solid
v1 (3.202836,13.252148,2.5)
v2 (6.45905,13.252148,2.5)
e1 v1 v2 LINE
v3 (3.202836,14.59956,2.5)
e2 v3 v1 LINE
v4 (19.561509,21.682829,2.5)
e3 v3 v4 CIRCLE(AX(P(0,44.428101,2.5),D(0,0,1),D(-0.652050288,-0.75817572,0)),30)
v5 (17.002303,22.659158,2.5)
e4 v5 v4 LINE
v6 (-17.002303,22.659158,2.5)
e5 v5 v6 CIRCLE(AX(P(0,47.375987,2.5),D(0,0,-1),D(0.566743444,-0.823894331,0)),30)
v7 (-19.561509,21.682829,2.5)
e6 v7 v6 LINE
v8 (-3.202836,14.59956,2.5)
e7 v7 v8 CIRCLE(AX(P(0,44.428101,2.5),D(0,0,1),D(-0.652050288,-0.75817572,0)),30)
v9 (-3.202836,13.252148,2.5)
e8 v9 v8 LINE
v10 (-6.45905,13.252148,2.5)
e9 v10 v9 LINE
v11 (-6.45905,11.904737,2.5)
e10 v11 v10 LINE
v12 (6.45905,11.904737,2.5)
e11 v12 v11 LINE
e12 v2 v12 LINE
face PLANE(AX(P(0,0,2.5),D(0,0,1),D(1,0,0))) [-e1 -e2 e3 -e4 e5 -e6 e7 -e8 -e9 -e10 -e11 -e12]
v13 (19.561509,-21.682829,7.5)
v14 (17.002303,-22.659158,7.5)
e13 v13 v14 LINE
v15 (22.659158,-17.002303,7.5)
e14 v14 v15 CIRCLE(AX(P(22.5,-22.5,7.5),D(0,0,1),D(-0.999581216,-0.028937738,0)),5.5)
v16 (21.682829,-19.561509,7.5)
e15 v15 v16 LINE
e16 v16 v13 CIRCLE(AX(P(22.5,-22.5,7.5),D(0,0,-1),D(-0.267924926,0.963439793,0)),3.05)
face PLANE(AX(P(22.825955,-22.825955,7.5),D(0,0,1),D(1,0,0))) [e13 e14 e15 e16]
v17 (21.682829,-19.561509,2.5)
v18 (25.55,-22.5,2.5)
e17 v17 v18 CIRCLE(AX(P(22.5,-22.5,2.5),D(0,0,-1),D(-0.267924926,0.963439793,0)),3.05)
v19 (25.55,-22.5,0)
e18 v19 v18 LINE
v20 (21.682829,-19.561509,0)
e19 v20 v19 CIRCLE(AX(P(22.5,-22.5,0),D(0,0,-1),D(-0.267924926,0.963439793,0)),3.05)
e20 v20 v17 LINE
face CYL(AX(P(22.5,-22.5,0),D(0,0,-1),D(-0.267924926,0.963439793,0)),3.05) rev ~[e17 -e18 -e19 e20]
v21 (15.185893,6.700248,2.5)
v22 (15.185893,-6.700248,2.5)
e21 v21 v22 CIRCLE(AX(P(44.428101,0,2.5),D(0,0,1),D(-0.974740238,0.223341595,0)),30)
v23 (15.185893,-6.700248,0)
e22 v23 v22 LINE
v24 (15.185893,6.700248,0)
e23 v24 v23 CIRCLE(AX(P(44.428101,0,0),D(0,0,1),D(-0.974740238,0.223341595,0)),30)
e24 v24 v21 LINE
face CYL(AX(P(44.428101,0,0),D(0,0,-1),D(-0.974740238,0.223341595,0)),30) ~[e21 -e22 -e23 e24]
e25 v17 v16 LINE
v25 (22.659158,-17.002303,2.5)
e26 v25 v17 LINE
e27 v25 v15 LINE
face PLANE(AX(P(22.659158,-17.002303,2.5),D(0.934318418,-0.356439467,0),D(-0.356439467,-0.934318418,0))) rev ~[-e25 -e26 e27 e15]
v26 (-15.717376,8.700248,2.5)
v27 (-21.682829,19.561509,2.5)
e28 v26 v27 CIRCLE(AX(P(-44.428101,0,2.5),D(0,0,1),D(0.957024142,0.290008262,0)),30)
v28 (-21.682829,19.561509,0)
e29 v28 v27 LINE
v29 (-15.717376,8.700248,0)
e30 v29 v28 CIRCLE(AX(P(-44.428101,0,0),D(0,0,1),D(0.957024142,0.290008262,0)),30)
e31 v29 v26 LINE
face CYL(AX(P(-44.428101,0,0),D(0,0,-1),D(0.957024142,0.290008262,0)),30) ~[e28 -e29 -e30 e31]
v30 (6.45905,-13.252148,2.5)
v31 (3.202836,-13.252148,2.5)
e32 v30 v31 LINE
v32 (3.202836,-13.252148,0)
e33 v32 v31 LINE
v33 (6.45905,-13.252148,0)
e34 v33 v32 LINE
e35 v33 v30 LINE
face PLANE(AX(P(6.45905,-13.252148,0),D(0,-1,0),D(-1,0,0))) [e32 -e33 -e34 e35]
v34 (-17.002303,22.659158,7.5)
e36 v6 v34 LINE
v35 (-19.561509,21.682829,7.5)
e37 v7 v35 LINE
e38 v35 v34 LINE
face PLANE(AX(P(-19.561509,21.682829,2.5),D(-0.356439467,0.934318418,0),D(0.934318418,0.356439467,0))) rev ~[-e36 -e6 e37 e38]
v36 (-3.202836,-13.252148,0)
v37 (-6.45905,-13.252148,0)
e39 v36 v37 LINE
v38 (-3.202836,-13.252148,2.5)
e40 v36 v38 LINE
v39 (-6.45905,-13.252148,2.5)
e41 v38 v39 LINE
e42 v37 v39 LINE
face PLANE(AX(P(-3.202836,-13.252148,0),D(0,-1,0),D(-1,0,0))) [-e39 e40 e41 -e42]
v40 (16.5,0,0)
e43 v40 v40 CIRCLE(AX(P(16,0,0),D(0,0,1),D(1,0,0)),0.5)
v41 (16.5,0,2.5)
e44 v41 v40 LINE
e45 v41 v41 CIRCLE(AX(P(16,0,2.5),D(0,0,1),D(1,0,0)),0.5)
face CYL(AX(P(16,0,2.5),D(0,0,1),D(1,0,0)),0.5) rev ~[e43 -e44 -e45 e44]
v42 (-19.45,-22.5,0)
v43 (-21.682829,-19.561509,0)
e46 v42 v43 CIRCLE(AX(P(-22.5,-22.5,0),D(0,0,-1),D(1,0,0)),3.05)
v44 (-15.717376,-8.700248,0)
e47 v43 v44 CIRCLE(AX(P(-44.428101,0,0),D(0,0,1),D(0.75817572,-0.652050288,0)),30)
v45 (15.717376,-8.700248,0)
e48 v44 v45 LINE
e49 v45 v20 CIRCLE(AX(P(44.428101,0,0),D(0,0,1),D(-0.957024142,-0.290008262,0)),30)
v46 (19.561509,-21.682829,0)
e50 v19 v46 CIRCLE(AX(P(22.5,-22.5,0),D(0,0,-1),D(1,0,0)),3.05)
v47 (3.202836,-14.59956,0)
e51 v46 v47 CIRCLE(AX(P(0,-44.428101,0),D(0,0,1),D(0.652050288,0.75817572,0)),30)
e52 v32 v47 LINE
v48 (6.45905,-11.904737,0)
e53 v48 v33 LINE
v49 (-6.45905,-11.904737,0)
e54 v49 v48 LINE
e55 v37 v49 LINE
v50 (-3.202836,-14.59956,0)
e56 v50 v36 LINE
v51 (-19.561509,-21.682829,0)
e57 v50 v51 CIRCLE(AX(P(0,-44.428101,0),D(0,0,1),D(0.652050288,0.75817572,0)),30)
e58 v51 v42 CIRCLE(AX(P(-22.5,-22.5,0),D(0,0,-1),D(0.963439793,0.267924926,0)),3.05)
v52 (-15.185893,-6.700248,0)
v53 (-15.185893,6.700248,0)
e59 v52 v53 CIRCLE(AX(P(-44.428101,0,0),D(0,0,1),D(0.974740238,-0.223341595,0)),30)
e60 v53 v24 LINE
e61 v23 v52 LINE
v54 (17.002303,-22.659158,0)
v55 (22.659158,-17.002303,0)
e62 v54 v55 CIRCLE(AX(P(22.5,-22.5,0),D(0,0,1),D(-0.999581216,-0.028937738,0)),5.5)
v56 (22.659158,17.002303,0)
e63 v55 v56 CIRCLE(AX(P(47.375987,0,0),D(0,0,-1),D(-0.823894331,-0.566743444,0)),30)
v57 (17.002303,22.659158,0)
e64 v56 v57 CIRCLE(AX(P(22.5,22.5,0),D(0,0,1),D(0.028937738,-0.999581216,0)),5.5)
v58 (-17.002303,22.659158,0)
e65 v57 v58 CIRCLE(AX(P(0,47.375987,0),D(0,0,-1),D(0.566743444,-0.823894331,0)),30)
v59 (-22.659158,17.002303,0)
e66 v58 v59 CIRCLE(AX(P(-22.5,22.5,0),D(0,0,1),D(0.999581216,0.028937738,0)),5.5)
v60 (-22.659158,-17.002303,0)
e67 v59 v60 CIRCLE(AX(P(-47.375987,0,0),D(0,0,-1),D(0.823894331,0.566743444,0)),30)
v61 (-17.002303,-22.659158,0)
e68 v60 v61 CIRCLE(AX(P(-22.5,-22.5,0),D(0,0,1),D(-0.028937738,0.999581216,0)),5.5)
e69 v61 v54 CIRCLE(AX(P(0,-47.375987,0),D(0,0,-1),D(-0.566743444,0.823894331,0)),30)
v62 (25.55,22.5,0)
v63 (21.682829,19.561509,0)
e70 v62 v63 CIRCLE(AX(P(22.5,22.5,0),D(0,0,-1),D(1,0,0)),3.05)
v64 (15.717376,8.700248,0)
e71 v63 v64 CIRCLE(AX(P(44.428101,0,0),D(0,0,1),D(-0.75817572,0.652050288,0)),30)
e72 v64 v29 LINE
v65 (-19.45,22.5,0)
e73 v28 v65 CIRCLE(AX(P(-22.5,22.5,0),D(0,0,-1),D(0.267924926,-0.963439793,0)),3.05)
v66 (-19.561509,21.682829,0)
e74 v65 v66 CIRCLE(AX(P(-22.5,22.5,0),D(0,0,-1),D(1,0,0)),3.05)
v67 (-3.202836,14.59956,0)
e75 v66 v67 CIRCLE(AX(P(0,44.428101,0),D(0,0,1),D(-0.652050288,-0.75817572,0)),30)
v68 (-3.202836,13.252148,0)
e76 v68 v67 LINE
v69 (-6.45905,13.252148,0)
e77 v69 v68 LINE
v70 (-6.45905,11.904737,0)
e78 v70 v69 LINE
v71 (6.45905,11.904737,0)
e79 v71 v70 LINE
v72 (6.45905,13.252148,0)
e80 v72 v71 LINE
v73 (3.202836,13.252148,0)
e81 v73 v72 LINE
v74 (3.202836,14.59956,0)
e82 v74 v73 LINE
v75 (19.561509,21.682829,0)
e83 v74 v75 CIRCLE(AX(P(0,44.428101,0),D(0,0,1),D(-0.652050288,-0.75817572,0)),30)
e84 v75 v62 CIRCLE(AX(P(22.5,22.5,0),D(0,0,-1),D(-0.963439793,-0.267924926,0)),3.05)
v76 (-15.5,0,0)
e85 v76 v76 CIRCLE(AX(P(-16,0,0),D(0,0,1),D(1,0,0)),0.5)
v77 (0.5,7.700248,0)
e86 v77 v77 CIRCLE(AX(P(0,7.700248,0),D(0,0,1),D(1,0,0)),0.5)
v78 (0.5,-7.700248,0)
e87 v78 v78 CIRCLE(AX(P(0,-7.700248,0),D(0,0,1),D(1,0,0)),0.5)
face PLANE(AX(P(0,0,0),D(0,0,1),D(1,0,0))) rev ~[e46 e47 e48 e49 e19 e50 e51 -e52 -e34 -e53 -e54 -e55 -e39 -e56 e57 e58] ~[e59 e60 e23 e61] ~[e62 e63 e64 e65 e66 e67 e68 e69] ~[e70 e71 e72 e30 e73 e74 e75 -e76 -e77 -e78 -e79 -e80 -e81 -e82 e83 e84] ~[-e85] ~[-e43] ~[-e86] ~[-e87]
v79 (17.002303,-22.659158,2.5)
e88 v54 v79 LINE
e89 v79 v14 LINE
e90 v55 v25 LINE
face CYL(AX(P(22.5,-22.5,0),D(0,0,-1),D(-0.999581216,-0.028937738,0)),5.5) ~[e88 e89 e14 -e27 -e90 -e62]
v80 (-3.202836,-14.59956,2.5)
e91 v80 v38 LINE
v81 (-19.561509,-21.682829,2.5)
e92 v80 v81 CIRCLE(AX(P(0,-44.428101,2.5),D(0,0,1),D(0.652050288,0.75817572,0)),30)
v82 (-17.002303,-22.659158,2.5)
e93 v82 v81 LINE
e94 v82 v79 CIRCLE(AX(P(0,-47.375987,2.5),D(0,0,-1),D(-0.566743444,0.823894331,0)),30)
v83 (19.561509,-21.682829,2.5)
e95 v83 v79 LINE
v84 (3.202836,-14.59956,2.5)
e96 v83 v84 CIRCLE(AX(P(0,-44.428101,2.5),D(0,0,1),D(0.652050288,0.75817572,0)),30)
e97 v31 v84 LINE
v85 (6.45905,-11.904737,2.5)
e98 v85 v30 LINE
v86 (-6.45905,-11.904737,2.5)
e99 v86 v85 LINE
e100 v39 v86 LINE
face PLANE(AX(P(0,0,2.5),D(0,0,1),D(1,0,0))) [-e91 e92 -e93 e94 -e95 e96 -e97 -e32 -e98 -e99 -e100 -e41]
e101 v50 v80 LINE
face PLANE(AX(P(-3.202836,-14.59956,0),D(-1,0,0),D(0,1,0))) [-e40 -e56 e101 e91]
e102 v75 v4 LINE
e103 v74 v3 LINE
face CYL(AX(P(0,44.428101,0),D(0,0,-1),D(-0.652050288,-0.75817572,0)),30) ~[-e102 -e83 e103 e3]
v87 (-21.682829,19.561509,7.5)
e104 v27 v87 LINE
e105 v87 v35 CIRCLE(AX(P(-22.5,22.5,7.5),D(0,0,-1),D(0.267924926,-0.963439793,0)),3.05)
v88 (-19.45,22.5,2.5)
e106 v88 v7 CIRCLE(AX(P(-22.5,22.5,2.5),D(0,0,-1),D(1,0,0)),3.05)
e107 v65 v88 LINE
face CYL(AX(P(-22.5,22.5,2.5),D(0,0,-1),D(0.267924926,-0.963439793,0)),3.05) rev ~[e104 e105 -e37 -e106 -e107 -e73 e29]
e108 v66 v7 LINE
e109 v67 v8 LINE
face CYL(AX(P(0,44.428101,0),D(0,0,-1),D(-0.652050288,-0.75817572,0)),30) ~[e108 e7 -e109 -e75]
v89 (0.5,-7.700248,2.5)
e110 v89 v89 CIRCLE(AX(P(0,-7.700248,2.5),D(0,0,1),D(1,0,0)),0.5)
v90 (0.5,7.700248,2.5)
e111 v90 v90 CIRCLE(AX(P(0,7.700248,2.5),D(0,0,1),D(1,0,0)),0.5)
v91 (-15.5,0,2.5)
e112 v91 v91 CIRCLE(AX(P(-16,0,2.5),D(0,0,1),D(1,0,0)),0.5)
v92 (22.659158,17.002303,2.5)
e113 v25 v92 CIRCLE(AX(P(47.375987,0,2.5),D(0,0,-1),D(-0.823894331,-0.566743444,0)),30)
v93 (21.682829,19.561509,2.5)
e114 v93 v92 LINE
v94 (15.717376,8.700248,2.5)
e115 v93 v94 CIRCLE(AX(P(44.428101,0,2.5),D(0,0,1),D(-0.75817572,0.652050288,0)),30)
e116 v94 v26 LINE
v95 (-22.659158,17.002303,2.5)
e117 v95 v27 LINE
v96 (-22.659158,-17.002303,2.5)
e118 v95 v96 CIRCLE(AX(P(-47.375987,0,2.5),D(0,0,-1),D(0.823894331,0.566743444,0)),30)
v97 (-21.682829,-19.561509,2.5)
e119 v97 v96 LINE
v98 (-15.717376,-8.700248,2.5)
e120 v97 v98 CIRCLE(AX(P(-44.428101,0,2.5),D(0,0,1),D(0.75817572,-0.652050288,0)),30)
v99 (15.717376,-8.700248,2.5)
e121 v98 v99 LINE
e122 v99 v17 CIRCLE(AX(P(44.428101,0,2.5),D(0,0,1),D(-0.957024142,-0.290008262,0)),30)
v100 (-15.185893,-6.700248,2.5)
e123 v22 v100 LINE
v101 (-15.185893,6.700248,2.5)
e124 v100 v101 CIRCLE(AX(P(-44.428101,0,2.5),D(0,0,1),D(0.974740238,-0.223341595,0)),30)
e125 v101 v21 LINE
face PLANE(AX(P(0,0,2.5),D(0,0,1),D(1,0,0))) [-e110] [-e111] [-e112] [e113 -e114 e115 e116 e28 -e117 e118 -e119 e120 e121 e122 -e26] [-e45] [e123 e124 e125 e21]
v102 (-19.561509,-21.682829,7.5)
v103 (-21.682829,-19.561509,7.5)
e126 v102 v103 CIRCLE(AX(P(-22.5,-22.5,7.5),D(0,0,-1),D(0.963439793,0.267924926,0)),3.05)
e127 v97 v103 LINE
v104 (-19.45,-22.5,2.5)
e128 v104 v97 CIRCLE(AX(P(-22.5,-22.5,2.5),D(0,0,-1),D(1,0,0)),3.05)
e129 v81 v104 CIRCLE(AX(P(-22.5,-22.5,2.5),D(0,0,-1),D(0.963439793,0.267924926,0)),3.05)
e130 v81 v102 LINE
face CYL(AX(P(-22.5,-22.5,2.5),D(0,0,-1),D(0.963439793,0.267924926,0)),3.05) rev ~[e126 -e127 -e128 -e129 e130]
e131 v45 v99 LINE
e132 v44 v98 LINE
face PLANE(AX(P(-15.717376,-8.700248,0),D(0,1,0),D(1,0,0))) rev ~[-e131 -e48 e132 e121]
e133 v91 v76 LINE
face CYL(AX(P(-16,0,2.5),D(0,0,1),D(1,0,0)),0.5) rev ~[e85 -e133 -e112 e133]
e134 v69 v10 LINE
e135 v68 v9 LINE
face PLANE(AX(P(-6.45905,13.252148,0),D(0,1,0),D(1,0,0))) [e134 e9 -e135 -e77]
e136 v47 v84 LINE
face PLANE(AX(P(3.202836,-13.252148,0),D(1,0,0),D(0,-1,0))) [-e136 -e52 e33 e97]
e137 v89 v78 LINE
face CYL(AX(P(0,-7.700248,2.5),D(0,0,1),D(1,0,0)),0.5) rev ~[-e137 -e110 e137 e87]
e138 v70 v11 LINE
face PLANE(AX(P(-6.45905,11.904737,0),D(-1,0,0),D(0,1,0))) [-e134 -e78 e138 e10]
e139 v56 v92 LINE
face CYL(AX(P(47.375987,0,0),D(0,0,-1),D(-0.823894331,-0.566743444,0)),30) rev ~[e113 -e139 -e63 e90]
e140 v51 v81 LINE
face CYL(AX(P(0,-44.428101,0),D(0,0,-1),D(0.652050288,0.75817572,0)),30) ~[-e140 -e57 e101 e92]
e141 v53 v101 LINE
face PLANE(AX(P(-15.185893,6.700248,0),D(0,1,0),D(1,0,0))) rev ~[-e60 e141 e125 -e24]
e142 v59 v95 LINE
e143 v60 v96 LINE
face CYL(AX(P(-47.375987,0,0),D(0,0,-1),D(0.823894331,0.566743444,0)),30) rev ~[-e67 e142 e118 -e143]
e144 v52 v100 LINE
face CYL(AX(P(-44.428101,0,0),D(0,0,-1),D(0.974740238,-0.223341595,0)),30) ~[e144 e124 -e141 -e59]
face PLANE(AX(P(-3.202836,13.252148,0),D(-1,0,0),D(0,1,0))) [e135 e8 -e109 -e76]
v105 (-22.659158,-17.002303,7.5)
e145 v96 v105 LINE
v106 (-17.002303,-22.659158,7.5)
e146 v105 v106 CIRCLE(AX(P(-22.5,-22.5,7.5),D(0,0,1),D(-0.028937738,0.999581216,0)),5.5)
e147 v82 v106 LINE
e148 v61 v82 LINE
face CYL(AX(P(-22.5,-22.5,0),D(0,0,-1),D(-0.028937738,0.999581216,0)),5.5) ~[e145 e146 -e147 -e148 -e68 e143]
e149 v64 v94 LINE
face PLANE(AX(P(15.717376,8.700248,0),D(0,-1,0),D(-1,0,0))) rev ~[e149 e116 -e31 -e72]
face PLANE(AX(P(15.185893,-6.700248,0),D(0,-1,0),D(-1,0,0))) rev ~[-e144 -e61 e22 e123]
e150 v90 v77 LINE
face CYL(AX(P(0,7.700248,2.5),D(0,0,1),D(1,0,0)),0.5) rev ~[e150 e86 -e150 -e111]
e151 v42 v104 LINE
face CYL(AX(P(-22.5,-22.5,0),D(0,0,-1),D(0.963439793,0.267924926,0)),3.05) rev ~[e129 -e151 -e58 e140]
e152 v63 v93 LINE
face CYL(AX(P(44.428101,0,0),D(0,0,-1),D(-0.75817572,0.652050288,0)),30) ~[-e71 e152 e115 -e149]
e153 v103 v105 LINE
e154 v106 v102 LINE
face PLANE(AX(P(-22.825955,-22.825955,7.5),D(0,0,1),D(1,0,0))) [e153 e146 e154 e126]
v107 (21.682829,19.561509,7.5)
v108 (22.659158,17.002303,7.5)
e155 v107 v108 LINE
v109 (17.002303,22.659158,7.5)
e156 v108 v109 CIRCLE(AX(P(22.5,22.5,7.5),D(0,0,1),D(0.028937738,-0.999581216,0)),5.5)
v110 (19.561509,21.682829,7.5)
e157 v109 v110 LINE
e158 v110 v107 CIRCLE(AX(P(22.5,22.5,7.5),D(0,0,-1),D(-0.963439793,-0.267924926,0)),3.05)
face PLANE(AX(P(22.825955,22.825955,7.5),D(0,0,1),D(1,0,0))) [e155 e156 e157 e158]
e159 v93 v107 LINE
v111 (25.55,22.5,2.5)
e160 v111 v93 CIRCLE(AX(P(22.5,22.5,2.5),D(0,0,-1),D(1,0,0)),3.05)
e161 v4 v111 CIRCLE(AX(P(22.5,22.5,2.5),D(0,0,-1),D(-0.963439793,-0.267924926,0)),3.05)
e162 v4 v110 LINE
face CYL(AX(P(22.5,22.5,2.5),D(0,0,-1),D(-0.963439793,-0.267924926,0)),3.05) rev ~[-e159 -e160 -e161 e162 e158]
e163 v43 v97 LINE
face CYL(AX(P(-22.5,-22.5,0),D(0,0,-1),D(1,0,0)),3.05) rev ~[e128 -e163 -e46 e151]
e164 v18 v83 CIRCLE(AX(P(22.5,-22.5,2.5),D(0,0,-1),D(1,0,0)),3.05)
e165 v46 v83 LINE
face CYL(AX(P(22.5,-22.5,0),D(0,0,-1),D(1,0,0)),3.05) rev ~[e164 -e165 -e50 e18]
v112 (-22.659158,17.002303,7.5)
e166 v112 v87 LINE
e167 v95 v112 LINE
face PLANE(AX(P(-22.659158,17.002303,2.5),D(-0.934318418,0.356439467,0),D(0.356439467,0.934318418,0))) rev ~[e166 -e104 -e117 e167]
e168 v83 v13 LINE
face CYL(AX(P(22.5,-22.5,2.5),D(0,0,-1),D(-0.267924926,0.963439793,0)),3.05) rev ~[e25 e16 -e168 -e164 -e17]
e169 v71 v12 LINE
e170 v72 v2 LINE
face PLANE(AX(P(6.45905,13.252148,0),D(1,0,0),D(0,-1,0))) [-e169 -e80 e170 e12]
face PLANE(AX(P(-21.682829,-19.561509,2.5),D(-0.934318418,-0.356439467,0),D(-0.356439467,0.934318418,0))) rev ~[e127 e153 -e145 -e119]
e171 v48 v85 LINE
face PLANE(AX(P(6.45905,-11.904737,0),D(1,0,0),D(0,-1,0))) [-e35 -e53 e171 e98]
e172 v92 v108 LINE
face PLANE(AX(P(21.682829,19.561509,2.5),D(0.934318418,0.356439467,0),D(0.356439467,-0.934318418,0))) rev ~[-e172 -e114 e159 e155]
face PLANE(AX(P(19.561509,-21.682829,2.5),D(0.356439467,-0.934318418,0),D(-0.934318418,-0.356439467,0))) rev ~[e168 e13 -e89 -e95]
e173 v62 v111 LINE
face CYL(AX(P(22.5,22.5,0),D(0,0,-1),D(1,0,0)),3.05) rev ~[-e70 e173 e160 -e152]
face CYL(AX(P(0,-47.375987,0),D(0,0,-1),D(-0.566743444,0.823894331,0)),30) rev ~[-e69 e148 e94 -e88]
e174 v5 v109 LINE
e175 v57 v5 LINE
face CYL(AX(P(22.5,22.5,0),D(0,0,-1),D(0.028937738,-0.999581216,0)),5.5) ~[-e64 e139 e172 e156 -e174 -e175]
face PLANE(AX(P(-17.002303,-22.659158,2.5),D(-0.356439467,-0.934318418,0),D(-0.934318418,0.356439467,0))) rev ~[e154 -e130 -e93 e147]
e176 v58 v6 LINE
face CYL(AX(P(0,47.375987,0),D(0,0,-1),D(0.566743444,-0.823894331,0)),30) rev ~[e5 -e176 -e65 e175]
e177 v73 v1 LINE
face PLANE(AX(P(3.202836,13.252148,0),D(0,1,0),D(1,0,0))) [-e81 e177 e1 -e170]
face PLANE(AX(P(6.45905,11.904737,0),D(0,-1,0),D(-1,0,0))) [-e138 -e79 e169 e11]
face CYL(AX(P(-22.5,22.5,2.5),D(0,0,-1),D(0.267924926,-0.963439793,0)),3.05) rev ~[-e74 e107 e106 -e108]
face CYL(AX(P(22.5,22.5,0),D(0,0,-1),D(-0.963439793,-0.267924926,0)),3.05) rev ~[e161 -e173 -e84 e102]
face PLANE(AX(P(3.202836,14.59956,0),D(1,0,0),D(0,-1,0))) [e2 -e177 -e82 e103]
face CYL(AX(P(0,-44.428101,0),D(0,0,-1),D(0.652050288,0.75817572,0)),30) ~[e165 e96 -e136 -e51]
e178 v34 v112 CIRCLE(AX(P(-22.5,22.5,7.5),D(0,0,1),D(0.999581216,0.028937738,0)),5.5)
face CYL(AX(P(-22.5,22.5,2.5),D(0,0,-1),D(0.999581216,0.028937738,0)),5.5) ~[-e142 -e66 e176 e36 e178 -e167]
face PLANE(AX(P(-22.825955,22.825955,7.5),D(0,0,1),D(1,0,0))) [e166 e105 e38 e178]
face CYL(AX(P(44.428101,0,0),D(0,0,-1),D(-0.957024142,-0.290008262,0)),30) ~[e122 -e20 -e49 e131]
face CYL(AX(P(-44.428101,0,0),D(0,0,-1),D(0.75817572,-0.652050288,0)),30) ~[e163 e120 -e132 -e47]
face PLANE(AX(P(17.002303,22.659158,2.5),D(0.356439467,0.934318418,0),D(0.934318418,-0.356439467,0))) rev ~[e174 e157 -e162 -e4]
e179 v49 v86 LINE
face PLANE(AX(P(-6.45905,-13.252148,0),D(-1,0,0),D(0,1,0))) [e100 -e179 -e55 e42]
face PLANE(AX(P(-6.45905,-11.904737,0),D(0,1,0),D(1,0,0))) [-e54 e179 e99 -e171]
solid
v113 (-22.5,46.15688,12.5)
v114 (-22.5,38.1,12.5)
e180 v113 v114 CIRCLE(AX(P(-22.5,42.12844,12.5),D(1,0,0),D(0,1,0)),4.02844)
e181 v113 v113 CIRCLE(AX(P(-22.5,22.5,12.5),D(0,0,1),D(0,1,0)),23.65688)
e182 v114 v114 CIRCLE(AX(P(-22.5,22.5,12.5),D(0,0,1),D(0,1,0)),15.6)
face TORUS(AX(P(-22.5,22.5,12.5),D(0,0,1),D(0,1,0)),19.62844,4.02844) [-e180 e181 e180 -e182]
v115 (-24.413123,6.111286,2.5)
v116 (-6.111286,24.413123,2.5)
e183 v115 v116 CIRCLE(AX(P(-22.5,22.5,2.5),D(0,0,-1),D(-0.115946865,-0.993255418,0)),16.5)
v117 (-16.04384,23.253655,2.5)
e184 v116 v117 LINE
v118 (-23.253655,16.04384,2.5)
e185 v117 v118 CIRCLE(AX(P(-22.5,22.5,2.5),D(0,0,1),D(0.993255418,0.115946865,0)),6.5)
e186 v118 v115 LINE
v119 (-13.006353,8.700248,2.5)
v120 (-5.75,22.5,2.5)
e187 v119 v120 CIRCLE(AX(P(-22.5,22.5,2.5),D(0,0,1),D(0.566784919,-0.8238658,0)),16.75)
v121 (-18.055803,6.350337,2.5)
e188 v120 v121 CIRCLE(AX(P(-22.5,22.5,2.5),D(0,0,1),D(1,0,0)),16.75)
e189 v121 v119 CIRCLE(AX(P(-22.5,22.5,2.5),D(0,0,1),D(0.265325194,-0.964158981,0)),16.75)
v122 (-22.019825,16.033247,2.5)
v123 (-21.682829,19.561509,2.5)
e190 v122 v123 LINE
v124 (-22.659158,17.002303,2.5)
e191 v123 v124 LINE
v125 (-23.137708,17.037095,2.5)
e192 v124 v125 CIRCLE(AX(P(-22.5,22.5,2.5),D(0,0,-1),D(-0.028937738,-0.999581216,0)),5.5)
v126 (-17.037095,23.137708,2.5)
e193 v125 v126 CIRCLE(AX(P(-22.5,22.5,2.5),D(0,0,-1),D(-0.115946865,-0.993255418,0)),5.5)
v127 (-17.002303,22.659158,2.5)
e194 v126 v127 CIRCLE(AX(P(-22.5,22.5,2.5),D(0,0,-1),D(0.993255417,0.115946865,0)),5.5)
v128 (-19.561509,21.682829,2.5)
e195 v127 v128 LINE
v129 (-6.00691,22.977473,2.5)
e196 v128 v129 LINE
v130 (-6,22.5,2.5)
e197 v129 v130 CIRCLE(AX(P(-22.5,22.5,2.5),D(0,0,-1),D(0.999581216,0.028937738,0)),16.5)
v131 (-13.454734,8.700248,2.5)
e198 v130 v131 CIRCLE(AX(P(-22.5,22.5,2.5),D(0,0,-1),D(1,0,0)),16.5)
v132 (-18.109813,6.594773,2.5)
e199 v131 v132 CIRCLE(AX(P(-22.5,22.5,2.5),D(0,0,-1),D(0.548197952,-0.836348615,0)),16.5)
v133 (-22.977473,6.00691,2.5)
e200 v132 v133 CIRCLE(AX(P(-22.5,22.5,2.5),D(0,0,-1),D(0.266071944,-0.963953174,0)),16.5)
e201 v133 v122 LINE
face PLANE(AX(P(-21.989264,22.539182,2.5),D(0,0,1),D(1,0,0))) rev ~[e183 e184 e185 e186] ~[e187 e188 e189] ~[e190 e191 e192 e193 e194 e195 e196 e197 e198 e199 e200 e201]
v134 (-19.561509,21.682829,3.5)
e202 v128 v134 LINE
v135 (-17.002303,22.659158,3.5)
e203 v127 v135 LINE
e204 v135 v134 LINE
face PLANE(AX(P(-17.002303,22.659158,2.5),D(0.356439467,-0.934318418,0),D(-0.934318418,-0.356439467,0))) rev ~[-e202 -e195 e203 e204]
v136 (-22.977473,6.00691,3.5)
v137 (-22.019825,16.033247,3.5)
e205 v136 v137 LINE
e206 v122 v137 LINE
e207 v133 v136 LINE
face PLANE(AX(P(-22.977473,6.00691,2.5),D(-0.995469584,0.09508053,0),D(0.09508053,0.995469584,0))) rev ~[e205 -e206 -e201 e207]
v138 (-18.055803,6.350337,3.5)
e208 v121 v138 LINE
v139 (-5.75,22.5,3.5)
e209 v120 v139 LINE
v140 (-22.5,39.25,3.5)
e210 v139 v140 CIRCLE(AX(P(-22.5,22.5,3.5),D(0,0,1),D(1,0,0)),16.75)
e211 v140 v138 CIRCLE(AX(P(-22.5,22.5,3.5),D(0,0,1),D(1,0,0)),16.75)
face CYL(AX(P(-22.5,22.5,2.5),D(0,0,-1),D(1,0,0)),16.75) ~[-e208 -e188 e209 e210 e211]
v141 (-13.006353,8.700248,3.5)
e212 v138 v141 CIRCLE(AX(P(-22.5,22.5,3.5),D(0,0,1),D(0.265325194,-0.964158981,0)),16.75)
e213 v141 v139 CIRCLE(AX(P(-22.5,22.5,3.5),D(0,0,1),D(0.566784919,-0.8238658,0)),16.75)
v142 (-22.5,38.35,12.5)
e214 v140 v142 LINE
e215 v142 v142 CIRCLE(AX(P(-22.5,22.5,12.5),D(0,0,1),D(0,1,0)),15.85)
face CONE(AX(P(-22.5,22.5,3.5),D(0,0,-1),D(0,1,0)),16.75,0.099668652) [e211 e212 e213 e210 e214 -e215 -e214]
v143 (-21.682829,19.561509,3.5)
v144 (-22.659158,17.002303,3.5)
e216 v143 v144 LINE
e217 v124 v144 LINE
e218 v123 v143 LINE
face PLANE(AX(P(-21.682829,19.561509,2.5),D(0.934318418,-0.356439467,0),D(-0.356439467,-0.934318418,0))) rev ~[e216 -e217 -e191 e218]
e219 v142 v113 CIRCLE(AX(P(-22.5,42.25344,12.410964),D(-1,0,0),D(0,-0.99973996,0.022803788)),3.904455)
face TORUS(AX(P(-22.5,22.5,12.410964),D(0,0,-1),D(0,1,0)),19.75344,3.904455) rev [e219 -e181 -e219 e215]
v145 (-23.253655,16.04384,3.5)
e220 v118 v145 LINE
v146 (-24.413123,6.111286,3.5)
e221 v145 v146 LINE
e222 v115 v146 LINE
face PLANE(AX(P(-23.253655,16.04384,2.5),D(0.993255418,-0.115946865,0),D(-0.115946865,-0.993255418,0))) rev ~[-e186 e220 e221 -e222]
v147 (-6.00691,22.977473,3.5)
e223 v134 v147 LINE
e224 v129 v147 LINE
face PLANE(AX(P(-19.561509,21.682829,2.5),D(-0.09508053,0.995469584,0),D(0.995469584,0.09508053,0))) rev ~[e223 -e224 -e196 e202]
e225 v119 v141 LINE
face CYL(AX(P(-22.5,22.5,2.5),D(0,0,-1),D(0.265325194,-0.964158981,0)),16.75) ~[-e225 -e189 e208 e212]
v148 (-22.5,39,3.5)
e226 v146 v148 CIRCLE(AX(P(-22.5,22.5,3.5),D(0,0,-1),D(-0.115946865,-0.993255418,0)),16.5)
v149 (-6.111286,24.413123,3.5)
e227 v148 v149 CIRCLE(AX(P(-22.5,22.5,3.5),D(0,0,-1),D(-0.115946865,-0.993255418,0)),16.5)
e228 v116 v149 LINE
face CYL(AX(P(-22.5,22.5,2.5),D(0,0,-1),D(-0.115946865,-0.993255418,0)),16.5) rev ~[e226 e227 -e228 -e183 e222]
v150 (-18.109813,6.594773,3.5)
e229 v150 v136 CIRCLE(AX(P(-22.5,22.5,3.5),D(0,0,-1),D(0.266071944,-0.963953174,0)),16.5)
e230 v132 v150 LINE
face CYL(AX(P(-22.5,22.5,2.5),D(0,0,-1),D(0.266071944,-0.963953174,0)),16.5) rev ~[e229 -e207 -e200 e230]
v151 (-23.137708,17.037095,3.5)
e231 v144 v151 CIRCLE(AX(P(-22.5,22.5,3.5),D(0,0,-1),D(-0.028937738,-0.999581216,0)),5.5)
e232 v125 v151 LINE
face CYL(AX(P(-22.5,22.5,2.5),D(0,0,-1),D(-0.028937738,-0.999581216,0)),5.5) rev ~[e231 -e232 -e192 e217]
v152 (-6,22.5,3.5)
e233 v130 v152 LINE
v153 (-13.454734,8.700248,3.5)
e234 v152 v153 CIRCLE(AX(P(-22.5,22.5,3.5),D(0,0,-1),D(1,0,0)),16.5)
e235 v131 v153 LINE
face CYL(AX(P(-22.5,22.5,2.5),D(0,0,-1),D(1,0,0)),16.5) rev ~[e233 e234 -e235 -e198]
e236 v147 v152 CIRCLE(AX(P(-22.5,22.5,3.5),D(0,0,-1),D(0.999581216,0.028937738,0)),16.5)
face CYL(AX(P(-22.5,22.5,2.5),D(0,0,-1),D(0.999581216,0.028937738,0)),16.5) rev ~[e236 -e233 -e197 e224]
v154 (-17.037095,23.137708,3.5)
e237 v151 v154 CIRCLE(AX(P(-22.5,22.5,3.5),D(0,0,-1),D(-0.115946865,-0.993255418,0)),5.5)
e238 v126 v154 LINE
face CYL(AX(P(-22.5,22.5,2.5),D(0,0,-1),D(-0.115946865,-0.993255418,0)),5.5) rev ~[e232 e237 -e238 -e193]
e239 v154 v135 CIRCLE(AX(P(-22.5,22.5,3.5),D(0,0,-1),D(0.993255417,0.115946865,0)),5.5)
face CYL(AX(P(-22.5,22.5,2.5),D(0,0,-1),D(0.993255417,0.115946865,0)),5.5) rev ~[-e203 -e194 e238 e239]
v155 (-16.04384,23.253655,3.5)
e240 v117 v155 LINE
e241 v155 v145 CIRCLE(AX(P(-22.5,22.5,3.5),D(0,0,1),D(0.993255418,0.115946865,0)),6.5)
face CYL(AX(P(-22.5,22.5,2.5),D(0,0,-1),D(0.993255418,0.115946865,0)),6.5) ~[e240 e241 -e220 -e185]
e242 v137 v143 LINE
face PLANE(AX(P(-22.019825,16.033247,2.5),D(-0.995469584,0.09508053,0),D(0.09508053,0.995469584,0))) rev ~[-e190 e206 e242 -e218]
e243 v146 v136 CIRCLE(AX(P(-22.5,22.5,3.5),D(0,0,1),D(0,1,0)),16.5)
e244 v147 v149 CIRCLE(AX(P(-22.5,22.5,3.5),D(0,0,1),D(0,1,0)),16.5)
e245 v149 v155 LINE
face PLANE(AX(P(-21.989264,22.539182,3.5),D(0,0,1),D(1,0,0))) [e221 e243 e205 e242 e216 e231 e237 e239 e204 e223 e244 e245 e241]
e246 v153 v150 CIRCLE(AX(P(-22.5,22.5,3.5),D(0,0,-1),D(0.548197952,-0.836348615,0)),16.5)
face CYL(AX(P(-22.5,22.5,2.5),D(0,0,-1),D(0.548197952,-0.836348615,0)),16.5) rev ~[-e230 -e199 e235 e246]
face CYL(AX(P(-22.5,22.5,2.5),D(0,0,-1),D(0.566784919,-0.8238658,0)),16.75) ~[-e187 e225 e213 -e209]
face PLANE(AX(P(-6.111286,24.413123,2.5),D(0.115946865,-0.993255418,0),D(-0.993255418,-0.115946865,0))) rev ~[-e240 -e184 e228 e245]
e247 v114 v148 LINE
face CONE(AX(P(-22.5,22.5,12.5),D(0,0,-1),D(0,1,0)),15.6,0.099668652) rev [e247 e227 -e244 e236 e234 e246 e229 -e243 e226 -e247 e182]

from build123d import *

# Parameters (mm, degrees)
F1_DEPTH = 2.5
F3_DEPTH = 5
F4_R     = 0.5
F5_DEPTH = 25
F7_DEPTH = 2.5
F9_DEPTH = 1


# Not quite as in the source:
# - a feature names something its author has since deleted; it is built from what else it names


with BuildPart() as f1:
    # F0 (on Top) → F1 (new body)
    with BuildSketch(Plane.XY):
        with BuildLine():
            ThreePointArc((-17.0023033122, 22.6591575617), (-26.3890872965, 26.3890872965), (-22.6591575617, 17.0023033122))
            ThreePointArc((-22.6591575617, 17.0023033122), (-17.3759874976, 0), (-22.6591575617, -17.0023033122))
            ThreePointArc((-22.6591575617, -17.0023033122), (-26.3890872965, -26.3890872965), (-17.0023033122, -22.6591575617))
            ThreePointArc((-17.0023033122, -22.6591575617), (0, -17.3759874976), (17.0023033122, -22.6591575617))
            ThreePointArc((17.0023033122, -22.6591575617), (26.3890872965, -26.3890872965), (22.6591575617, -17.0023033122))
            ThreePointArc((22.6591575617, -17.0023033122), (17.3759874976, 0), (22.6591575617, 17.0023033122))
            ThreePointArc((22.6591575617, 17.0023033122), (26.3890872965, 26.3890872965), (17.0023033122, 22.6591575617))
            ThreePointArc((17.0023033122, 22.6591575617), (0, 17.3759874976), (-17.0023033122, 22.6591575617))
        make_face()
        with BuildLine():
            ThreePointArc((-21.682828976, 19.5615086324), (-24.9284636731, 24.3452816014), (-19.45, 22.5))
            ThreePointArc((-19.45, 22.5), (-19.4780057353, 22.0876280024), (-19.5615086324, 21.682828976))
            ThreePointArc((-19.5615086324, 21.682828976), (0, 14.428100573), (19.5615086324, 21.682828976))
            ThreePointArc((19.5615086324, 21.682828976), (22.0876280024, 25.5219942647), (25.55, 22.5))
            ThreePointArc((25.55, 22.5), (24.3452816014, 20.0715363269), (21.682828976, 19.5615086324))
            ThreePointArc((21.682828976, 19.5615086324), (18.1332032787, 14.4422427718), (15.7173763175, 8.700247854))
            ThreePointArc((15.7173763175, 8.700247854), (15.4343846251, 7.7048319598), (15.1858934283, 6.700247854))
            ThreePointArc((15.1858934283, 6.700247854), (14.428100573, 0), (15.1858934283, -6.700247854))
            ThreePointArc((15.1858934283, -6.700247854), (15.4343846251, -7.7048319598), (15.7173763175, -8.700247854))
            ThreePointArc((15.7173763175, -8.700247854), (18.1332032787, -14.4422427718), (21.682828976, -19.5615086324))
            ThreePointArc((21.682828976, -19.5615086324), (24.3452816014, -20.0715363269), (25.55, -22.5))
            ThreePointArc((25.55, -22.5), (22.0876280024, -25.5219942647), (19.5615086324, -21.682828976))
            ThreePointArc((19.5615086324, -21.682828976), (0, -14.428100573), (-19.5615086324, -21.682828976))
            ThreePointArc((-19.5615086324, -21.682828976), (-19.4780057353, -22.0876280024), (-19.45, -22.5))
            ThreePointArc((-19.45, -22.5), (-24.9284636731, -24.3452816014), (-21.682828976, -19.5615086324))
            ThreePointArc((-21.682828976, -19.5615086324), (-18.1332032787, -14.4422427718), (-15.7173763175, -8.700247854))
            ThreePointArc((-15.7173763175, -8.700247854), (-15.4343846251, -7.7048319598), (-15.1858934283, -6.700247854))
            ThreePointArc((-15.1858934283, -6.700247854), (-14.428100573, 0), (-15.1858934283, 6.700247854))
            ThreePointArc((-15.1858934283, 6.700247854), (-15.4343846251, 7.7048319598), (-15.7173763175, 8.700247854))
            ThreePointArc((-15.7173763175, 8.700247854), (-18.1332032787, 14.4422427718), (-21.682828976, 19.5615086324))
        make_face(mode=Mode.SUBTRACT)
        with BuildLine():
            Line((15.7173763175, 8.700247854), (-15.7173763175, 8.700247854))
            ThreePointArc((-15.7173763175, 8.700247854), (-15.4343846251, 7.7048319598), (-15.1858934283, 6.700247854))
            Line((-15.1858934283, 6.700247854), (15.1858934283, 6.700247854))
            ThreePointArc((15.1858934283, 6.700247854), (15.4343846251, 7.7048319598), (15.7173763175, 8.700247854))
        make_face()
        with BuildLine():
            Line((15.1858934283, -6.700247854), (-15.1858934283, -6.700247854))
            ThreePointArc((-15.1858934283, -6.700247854), (-15.4343846251, -7.7048319598), (-15.7173763175, -8.700247854))
            Line((-15.7173763175, -8.700247854), (15.7173763175, -8.700247854))
            ThreePointArc((15.7173763175, -8.700247854), (15.4343846251, -7.7048319598), (15.1858934283, -6.700247854))
        make_face()
    extrude(amount=F1_DEPTH)

    # F2 (on face) → F3 (join)
    with BuildSketch(Plane.XY.offset(2.5)):
        with BuildLine():
            ThreePointArc((-21.682828976, 19.5615086324), (-24.6566756826, 24.6566756826), (-19.5615086324, 21.682828976))
            Line((-19.5615086324, 21.682828976), (-17.0023033122, 22.6591575617))
            ThreePointArc((-17.0023033122, 22.6591575617), (-26.3890872965, 26.3890872965), (-22.6591575617, 17.0023033122))
            Line((-22.6591575617, 17.0023033122), (-21.682828976, 19.5615086324))
        make_face()
        with BuildLine():
            Line((-21.682828976, -19.5615086324), (-22.6591575617, -17.0023033122))
            ThreePointArc((-22.6591575617, -17.0023033122), (-26.3890872965, -26.3890872965), (-17.0023033122, -22.6591575617))
            Line((-17.0023033122, -22.6591575617), (-19.5615086324, -21.682828976))
            ThreePointArc((-19.5615086324, -21.682828976), (-24.6566756826, -24.6566756826), (-21.682828976, -19.5615086324))
        make_face()
        with BuildLine():
            ThreePointArc((17.0023033122, -22.6591575617), (26.3890872965, -26.3890872965), (22.6591575617, -17.0023033122))
            Line((22.6591575617, -17.0023033122), (21.682828976, -19.5615086324))
            ThreePointArc((21.682828976, -19.5615086324), (24.6566756826, -24.6566756826), (19.5615086324, -21.682828976))
            Line((19.5615086324, -21.682828976), (17.0023033122, -22.6591575617))
        make_face()
        with BuildLine():
            Line((17.0023033122, 22.6591575617), (19.5615086324, 21.682828976))
            ThreePointArc((19.5615086324, 21.682828976), (24.6566756826, 24.6566756826), (21.682828976, 19.5615086324))
            Line((21.682828976, 19.5615086324), (22.6591575617, 17.0023033122))
            ThreePointArc((22.6591575617, 17.0023033122), (26.3890872965, 26.3890872965), (17.0023033122, 22.6591575617))
        make_face()
    extrude(amount=F3_DEPTH)

    # F4 (on face) → F5 (cut)
    with BuildSketch(Plane.XY.offset(2.5)):
        with Locations((16, 0)):
            Circle(F4_R)
        with Locations((-16, 0)):
            Circle(F4_R)
        with Locations((0, 7.700247854)):
            Circle(F4_R)
        with Locations((0, -7.700247854)):
            Circle(F4_R)
    extrude(amount=-F5_DEPTH, mode=Mode.SUBTRACT)

    # F6 (on face) → F7 (join, through all)
    with BuildSketch(Plane(origin=(0, 0, 0), x_dir=(1, 0, 0), z_dir=(0, 0, -1))):
        with BuildLine():
            Line((-3.2028362621, -13.2521484047), (-3.2028362621, -14.59955988))
            ThreePointArc((-3.2028362621, -14.59955988), (0, -14.428100573), (3.2028362621, -14.59955988))
            Line((3.2028362621, -14.59955988), (3.2028362621, -13.2521484047))
            Line((3.2028362621, -13.2521484047), (6.4590500986, -13.2521484047))
            Line((6.4590500986, -13.2521484047), (6.4590500986, -11.9047369295))
            Line((6.4590500986, -11.9047369295), (-6.4590500986, -11.9047369295))
            Line((-6.4590500986, -11.9047369295), (-6.4590500986, -13.2521484047))
            Line((-6.4590500986, -13.2521484047), (-3.2028362621, -13.2521484047))
        make_face()
        with BuildLine():
            Line((3.2028362621, 13.2521484047), (3.2028362621, 14.59955988))
            ThreePointArc((3.2028362621, 14.59955988), (0, 14.428100573), (-3.2028362621, 14.59955988))
            Line((-3.2028362621, 14.59955988), (-3.2028362621, 13.2521484047))
            Line((-3.2028362621, 13.2521484047), (-6.4590500986, 13.2521484047))
            Line((-6.4590500986, 13.2521484047), (-6.4590500986, 11.9047369295))
            Line((-6.4590500986, 11.9047369295), (6.4590500986, 11.9047369295))
            Line((6.4590500986, 11.9047369295), (6.4590500986, 13.2521484047))
            Line((6.4590500986, 13.2521484047), (3.2028362621, 13.2521484047))
        make_face()
    extrude(amount=-F7_DEPTH)


with BuildPart() as f9:
    # F8 (on face) → F9 (new body)
    with BuildSketch(Plane.XY.offset(2.5)):
        with BuildLine():
            ThreePointArc((-18.1098129291, 6.5947726366), (-20.5216852868, 6.1190271688), (-22.9774726852, 6.0069099367))
            ThreePointArc((-22.9774726852, 6.0069099367), (-23.6964367213, 6.0434347699), (-24.4131232722, 6.1112856104))
            ThreePointArc((-24.4131232722, 6.1112856104), (-34.1672618896, 34.1672618896), (-6.1112856104, 24.4131232722))
            ThreePointArc((-6.1112856104, 24.4131232722), (-6.0434347699, 23.6964367213), (-6.0069099367, 22.9774726852))
            ThreePointArc((-6.0069099367, 22.9774726852), (-6.0017275746, 22.7387613413), (-6, 22.5))
            ThreePointArc((-6, 22.5), (-7.9828223753, 14.6577073624), (-13.4547337956, 8.700247854))
            Line((-13.4547337956, 8.700247854), (-13.006352613, 8.700247854))
            ThreePointArc((-13.006352613, 8.700247854), (-7.6746653709, 14.704363199), (-5.75, 22.5))
            ThreePointArc((-5.75, 22.5), (-35.8229651319, 32.6519013044), (-18.0558029963, 6.3503370626))
            ThreePointArc((-18.0558029963, 6.3503370626), (-18.0825530037, 6.4726111847), (-18.1098129291, 6.5947726366))
        make_face()
        with BuildLine():
            ThreePointArc((-13.4547337956, 8.700247854), (-15.7002862082, 7.4662415761), (-18.1098129291, 6.5947726366))
            ThreePointArc((-18.1098129291, 6.5947726366), (-18.0825530037, 6.4726111847), (-18.0558029963, 6.3503370626))
            ThreePointArc((-18.0558029963, 6.3503370626), (-15.4327235269, 7.3139503737), (-13.006352613, 8.700247854))
            Line((-13.006352613, 8.700247854), (-13.4547337956, 8.700247854))
        make_face()
        with BuildLine():
            Line((-6.1112856104, 24.4131232722), (-16.0438397859, 23.2536546224))
            ThreePointArc((-16.0438397859, 23.2536546224), (-16.0171106669, 22.9713235569), (-16.0027220963, 22.6880953002))
            Line((-16.0027220963, 22.6880953002), (-6.0069099367, 22.9774726852))
            ThreePointArc((-6.0069099367, 22.9774726852), (-6.0434347699, 23.6964367213), (-6.1112856104, 24.4131232722))
        make_face()
        with BuildLine():
            Line((-22.9774726852, 6.0069099367), (-22.6880953002, 16.0027220963))
            ThreePointArc((-22.6880953002, 16.0027220963), (-22.9713235569, 16.0171106669), (-23.2536546224, 16.0438397859))
            Line((-23.2536546224, 16.0438397859), (-24.4131232722, 6.1112856104))
            ThreePointArc((-24.4131232722, 6.1112856104), (-23.6964367213, 6.0434347699), (-22.9774726852, 6.0069099367))
        make_face()
        with BuildLine():
            Line((-23.2536546224, 16.0438397859), (-23.1377077574, 17.0370952035))
            ThreePointArc((-23.1377077574, 17.0370952035), (-26.3890872965, 26.3890872965), (-17.0370952035, 23.1377077574))
            Line((-17.0370952035, 23.1377077574), (-16.0438397859, 23.2536546224))
            ThreePointArc((-16.0438397859, 23.2536546224), (-27.0961940777, 27.0961940777), (-23.2536546224, 16.0438397859))
        make_face()
        with BuildLine():
            Line((-22.6880953002, 16.0027220963), (-22.6591575617, 17.0023033122))
            ThreePointArc((-22.6591575617, 17.0023033122), (-22.8988122404, 17.0144782566), (-23.1377077574, 17.0370952035))
            Line((-23.1377077574, 17.0370952035), (-23.2536546224, 16.0438397859))
            ThreePointArc((-23.2536546224, 16.0438397859), (-22.9713235569, 16.0171106669), (-22.6880953002, 16.0027220963))
        make_face()
        with BuildLine():
            Line((-16.0438397859, 23.2536546224), (-17.0370952035, 23.1377077574))
            ThreePointArc((-17.0370952035, 23.1377077574), (-17.0144782566, 22.8988122404), (-17.0023033122, 22.6591575617))
            Line((-17.0023033122, 22.6591575617), (-16.0027220963, 22.6880953002))
            ThreePointArc((-16.0027220963, 22.6880953002), (-16.0171106669, 22.9713235569), (-16.0438397859, 23.2536546224))
        make_face()
        with BuildLine():
            ThreePointArc((-22.0198246983, 16.0332469604), (-22.3348030624, 16.520868079), (-22.6591575617, 17.0023033122))
            Line((-22.6591575617, 17.0023033122), (-22.6880953002, 16.0027220963))
            Line((-22.6880953002, 16.0027220963), (-22.9774726852, 6.0069099367))
            Line((-22.9774726852, 6.0069099367), (-22.0198246983, 16.0332469604))
        make_face()
        with BuildLine():
            Line((-21.682828976, 19.5615086324), (-22.6591575617, 17.0023033122))
            ThreePointArc((-22.6591575617, 17.0023033122), (-22.3348030624, 16.520868079), (-22.0198246983, 16.0332469604))
            Line((-22.0198246983, 16.0332469604), (-21.682828976, 19.5615086324))
        make_face()
        Polygon((-16.0027220963, 22.6880953002), (-17.0023033122, 22.6591575617), (-19.5615086324, 21.682828976), (-6.0069099367, 22.9774726852), align=None)
    extrude(amount=F9_DEPTH)

    # F12 (on line) → F13 (revolve)
    with BuildSketch(Plane.YZ.offset(-22.5)):
        with BuildLine():
            Line((38.1, 12.5), (39, 3.5))
            Line((39, 3.5), (39.25, 3.5))
            Line((39.25, 3.5), (38.35, 12.5))
            ThreePointArc((38.35, 12.5), (42.25344, 16.3154189444), (46.15688, 12.5))
            ThreePointArc((46.15688, 12.5), (42.12844, 16.52844), (38.1, 12.5))
        make_face()
    revolve(axis=Axis((-22.5, 22.5, 14.4747497439), (0, 0, 1)))


solid = Compound([f1.part, f9.part])
